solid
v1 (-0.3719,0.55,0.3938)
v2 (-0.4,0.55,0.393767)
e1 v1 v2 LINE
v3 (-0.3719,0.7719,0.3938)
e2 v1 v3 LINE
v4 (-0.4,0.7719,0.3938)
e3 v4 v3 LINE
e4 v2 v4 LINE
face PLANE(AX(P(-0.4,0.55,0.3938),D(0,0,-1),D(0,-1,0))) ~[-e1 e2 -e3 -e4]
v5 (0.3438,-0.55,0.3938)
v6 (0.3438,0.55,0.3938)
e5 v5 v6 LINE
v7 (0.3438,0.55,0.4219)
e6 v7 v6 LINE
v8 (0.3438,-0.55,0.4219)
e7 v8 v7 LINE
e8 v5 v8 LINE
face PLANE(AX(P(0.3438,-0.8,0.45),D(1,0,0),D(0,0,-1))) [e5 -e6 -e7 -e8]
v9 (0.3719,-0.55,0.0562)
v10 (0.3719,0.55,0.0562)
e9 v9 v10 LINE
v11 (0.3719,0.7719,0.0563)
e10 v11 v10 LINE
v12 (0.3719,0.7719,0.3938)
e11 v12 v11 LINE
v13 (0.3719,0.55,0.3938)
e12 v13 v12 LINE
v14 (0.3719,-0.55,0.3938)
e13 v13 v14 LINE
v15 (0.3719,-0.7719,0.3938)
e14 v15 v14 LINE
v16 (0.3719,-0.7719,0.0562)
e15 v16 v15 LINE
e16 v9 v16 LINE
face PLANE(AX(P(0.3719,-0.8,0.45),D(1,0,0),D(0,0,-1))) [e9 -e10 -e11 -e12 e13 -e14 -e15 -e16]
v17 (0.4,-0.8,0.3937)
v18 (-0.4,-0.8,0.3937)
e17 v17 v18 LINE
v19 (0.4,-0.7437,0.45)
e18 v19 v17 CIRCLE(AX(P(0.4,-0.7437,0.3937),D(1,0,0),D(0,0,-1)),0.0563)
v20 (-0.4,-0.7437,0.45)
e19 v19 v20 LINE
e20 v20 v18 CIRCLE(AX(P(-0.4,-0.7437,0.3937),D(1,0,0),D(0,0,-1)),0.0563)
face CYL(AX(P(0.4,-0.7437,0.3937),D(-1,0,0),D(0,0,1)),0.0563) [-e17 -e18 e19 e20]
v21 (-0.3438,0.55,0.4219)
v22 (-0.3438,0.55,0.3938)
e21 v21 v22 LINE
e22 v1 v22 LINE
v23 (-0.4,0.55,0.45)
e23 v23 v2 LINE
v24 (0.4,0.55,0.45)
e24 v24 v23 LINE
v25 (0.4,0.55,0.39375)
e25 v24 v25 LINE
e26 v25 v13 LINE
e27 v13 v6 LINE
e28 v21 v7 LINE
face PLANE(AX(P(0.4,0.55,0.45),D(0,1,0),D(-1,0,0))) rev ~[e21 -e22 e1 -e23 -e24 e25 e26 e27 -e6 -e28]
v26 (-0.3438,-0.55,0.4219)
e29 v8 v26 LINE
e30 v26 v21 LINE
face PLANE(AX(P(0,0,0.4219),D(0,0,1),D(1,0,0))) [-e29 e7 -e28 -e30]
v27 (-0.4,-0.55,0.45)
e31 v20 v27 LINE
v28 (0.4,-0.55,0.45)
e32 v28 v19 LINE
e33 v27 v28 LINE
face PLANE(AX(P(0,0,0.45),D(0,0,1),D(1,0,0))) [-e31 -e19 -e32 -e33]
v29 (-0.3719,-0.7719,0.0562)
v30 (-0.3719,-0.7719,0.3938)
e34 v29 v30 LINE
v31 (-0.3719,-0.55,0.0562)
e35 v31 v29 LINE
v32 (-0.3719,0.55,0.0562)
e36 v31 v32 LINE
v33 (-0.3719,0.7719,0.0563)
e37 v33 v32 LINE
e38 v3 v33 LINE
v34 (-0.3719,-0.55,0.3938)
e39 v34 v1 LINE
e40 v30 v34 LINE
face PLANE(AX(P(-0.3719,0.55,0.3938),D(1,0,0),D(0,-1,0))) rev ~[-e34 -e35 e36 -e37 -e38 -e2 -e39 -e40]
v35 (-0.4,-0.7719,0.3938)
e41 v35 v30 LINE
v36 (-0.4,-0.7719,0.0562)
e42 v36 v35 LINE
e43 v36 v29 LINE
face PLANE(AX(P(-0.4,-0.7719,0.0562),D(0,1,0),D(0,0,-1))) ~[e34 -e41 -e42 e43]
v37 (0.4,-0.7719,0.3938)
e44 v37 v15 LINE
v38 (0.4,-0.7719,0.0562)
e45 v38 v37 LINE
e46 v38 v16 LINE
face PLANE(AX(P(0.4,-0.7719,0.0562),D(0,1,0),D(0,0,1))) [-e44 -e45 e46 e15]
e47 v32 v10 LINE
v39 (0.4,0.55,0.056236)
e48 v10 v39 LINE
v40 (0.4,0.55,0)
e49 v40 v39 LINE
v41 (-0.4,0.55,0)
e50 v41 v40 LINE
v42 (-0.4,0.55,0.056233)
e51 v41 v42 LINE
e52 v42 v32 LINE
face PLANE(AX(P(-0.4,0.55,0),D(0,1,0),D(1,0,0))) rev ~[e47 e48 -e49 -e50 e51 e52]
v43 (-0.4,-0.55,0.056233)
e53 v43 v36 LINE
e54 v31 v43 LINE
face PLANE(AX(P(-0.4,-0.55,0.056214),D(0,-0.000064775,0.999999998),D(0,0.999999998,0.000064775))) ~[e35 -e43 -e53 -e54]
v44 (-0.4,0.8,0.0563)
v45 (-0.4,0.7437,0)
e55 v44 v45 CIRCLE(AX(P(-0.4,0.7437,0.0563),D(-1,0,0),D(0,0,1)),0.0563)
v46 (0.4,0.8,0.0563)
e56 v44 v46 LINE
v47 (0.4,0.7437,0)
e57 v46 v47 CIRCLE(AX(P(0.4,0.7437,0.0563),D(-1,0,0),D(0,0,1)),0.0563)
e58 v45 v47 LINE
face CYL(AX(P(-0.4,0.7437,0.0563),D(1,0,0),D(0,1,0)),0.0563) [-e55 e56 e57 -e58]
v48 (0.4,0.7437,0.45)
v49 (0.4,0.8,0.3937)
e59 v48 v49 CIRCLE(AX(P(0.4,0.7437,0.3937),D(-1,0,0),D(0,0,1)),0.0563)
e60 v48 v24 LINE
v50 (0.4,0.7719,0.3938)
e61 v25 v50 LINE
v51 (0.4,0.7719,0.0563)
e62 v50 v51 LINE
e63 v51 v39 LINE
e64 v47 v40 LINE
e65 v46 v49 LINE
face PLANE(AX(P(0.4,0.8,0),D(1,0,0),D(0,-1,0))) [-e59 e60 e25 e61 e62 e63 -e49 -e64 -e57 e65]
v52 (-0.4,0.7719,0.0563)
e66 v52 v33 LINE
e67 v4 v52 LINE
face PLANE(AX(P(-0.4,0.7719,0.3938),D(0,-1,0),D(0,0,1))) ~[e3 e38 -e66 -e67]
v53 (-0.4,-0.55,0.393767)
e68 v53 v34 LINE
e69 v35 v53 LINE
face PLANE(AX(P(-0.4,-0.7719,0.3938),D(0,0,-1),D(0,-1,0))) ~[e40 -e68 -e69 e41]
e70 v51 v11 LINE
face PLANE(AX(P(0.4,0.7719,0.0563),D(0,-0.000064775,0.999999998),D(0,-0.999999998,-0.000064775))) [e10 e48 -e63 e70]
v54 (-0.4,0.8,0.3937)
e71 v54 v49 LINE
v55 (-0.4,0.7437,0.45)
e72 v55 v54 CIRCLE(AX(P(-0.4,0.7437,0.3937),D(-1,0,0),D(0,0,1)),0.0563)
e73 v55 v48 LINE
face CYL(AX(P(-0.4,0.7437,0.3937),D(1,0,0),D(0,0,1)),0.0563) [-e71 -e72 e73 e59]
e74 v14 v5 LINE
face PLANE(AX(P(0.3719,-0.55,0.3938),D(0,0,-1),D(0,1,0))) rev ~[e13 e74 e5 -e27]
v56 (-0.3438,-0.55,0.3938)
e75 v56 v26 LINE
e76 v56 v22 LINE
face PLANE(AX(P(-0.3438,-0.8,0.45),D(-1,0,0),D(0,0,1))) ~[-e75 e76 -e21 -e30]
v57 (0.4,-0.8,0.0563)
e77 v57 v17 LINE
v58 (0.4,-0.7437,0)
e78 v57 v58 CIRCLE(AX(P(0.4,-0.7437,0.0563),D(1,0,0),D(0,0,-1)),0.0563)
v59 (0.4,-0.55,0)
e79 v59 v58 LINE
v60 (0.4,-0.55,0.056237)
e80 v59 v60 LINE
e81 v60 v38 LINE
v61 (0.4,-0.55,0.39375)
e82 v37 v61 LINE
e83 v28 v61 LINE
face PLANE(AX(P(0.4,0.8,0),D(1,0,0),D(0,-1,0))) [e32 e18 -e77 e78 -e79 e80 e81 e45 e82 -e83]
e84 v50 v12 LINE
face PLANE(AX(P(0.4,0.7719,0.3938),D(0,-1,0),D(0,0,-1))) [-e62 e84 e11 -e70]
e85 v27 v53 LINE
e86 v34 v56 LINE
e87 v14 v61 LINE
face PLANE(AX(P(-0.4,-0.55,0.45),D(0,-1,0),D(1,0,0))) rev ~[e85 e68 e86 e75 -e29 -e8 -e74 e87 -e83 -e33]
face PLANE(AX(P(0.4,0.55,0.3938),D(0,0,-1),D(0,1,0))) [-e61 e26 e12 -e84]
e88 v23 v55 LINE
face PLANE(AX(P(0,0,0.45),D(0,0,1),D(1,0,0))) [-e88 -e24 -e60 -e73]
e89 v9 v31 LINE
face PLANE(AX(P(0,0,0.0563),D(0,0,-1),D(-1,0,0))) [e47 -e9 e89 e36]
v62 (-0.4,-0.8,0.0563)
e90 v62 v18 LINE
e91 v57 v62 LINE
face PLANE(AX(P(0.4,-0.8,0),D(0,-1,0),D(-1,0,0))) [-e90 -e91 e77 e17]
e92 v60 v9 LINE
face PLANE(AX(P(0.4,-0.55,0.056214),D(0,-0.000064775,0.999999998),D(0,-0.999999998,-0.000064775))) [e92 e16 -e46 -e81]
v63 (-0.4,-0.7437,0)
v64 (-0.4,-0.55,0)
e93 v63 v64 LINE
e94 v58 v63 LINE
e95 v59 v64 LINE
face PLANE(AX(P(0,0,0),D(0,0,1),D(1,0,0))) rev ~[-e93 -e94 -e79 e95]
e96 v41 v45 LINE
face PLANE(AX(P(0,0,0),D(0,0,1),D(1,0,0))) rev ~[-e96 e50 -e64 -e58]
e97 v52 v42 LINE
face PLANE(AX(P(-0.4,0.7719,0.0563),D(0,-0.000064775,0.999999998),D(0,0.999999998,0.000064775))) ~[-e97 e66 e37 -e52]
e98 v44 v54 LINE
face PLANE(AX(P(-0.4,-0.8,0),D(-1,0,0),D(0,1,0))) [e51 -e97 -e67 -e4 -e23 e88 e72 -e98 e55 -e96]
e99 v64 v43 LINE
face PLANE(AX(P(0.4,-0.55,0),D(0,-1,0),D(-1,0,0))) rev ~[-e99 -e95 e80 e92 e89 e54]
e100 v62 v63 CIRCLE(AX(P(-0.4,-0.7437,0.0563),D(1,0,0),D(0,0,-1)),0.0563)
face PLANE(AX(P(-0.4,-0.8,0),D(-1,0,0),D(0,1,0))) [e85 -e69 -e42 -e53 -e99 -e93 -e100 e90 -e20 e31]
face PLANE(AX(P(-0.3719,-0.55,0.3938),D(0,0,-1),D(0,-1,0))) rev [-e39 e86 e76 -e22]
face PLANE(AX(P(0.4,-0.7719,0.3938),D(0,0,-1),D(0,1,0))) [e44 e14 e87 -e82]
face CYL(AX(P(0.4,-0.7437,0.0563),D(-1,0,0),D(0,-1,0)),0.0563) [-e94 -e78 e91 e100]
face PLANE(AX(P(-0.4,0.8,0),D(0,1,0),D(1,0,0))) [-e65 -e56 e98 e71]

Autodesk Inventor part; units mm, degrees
ref_plane "YZ Plane" through (0, 0, 0) normal (1, 0, 0) x (0, 1, 0)
ref_plane "XZ Plane" through (0, 0, 0) normal (0, 1, 0) x (-1, 0, 0)
ref_plane "XY Plane" through (0, 0, 0) normal (0, 0, 1) x (1, 0, 0)
sketch "Sketch1" plane through (0, 0, 0) normal (0, 0, 1) x (1, 0, 0)
  line L0 (0.4, -0.8) -> (-0.4, -0.8)
  line L1 (-0.4, -0.8) -> (-0.4, 0.8)
  line L2 (-0.4, 0.8) -> (0.4, 0.8)
  line L3 (0.4, 0.8) -> (0.4, -0.8)
  line L4 (0.4, -0.8) -> (-0.4, 0.8) construction
  line L5 (-0.4, -0.8) -> (0.4, 0.8) construction
  point P0 (0, 0)
  dimension "d0" = 0.8
  dimension "d1" = 1.6
extrude "Extrusion1" add sketch "Sketch1" along normal blind 0.45
sketch "Sketch2" plane through (0, 0, 0) normal (0, 0, -1) x (-1, 0, 0)
  line L0 (-0.4, -0.8) -> (0.4, -0.8) projected
  line L1 (0.4, -0.8) -> (0.4, 0.8) projected
  line L2 (0.4, 0.8) -> (-0.4, 0.8) projected
  line L3 (-0.4, 0.8) -> (-0.4, -0.8) projected
  line L4 (-0.4, -0.55) -> (0.4, -0.55)
  line L5 (0.4, 0.8) -> (0.4, -0.8) projected
  line L6 (0.4, 0.55) -> (-0.4, 0.55)
  point P0 (0, 0)
  dimension "d4" = 0.25
  dimension "d5" = 0.25
extrude "Extrusion2" cut sketch "Sketch2" against normal blind 0.0563 contours L3 L6 L1 L4
sketch "Sketch3" plane through (0, 0, 0.45) normal (0, 0, 1) x (1, 0, 0)
  line L0 (-0.4, -0.8) -> (0.4, -0.8) projected
  line L1 (0.4, -0.8) -> (0.4, 0.8) projected
  line L2 (0.4, 0.8) -> (-0.4, 0.8) projected
  line L3 (-0.4, 0.8) -> (-0.4, -0.8) projected
  line L4 (-0.4, 0.55) -> (-0.4, -0.55) projected
  line L5 (-0.4, -0.8) -> (-0.4, 0.8) projected
  line L6 (0.4, 0.8) -> (-0.4, 0.8) projected
  line L7 (0.4, 0.55) -> (-0.4, 0.55)
  line L8 (-0.4, 0.55) -> (-0.4, -0.55)
  line L9 (-0.4, -0.55) -> (0.4, -0.55)
  line L10 (0.4, -0.55) -> (0.4, 0.55)
  line L11 (0.4, 0.55) -> (-0.4, -0.55) construction
  line L12 (-0.4, 0.55) -> (0.4, -0.55) construction
  point P0 (0, 0)
  dimension "d22" = 0.25
extrude "Extrusion7" cut sketch "Sketch3" against normal blind 0.0563 contours L3 L7 L1 L9
sketch "Sketch4" plane through (0.4, -0.8, 0.45) normal (1, 0, 0) x (0, 0, -1)
  line L0 (0, 0) -> (0, 0.25) projected
  line L1 (0.45, 0) -> (0, 0) projected
  line L2 (0.45, 0.25) -> (0.45, 0) projected
  line L3 (0.45, 1.6) -> (0, 1.6) projected
  line L4 (0.45, 0.25) -> (0.3938, 0.25) projected
  line L5 (0.3938, 0.25) -> (0.3938, 1.35) projected
  line L6 (0.3938, 1.35) -> (0.45, 1.35) projected
  line L7 (0.45, 1.6) -> (0.45, 1.35) projected
  line L8 (0.0562, 0.25) -> (0, 0.25) projected
  line L9 (0, 1.35) -> (0.0562, 1.35) projected
  line L10 (0.0562, 1.35) -> (0.0562, 0.25) projected
  line L11 (0.3938, 0.0281) -> (0.0562, 0.0281)
  line L12 (0.0562, 0.0281) -> (0.0562, 1.5719)
  line L13 (0.0562, 1.5719) -> (0.3937, 1.5719)
  line L14 (0.3937, 1.5719) -> (0.3938, 0.0281)
  line L15 (0.3938, 0.0281) -> (0.0562, 1.5719) construction
  line L16 (0.0562, 0.0281) -> (0.3937, 1.5719) construction
  line L17 (0, 1.35) -> (0, 1.6) projected
  point P0 (0.225, 0.8)
  dimension "d25" = 0.0281
  dimension "d26" = 0.0281
extrude "Extrusion8" cut sketch "Sketch4" against normal blind 0.0281 contours L10 L12 L13 L14 L5 L11
mirror "Mirror1" about plane through (0, 0, 0) normal (1, 0, 0) of "Extrusion8"
sketch "Sketch7" plane through (0, 0, 0.3938) normal (0, 0, 1) x (1, 0, 0)
  line L0 (-0.3719, 0.55) -> (-0.3719, -0.55) projected
  line L1 (0.3719, -0.55) -> (-0.3719, -0.55) projected
  line L2 (0.3719, -0.55) -> (0.3719, 0.55) projected
  line L3 (-0.3719, 0.55) -> (0.3719, 0.55) projected
  point P0 (0, 0)
extrude "Extrusion9" add sketch "Sketch7" along normal blind 0.0281
sketch "Sketch8" plane through (0.3719, -0.8, 0.45) normal (1, 0, 0) x (0, 0, -1)
  line L0 (0.3938, 0.0281) -> (0.0562, 0.0281) projected
  line L1 (0.3938, 0.25) -> (0.3938, 0.0281) projected
  line L2 (0.3937, 1.35) -> (0.3938, 0.25) projected
  line L3 (0.3937, 1.5719) -> (0.3937, 1.35) projected
  line L4 (0.0562, 1.5719) -> (0.3937, 1.5719) projected
  line L5 (0.0562, 1.35) -> (0.0562, 1.5719) projected
  line L6 (0.0281, 1.35) -> (0.0562, 1.35) projected
  line L7 (0.0281, 0.25) -> (0.0281, 1.35) projected
  line L8 (0.0562, 0.25) -> (0.0281, 0.25) projected
  line L9 (0.0562, 0.0281) -> (0.0562, 0.25) projected
  line L10 (0.0562, 0.25) -> (0.0562, 1.35)
  point P0 (0.45, 0.8)
extrude "Extrusion10" cut sketch "Sketch8" against normal blind 0.0281 contours L8 L7 L6 L10
mirror "Mirror2" about plane through (0, 0, 0) normal (1, 0, 0) of "Extrusion10"
fillet "Fillet1" radius 0.0563 4 edges at (0, -0.8, 0.45) (0, 0.8, 0.45) (0, 0.8, 0) (0, -0.8, 0)
equation "\"d0\" = width"
equation "\"d1\" = length"
equation "\"d2\" = height"
equation "\"d4\" = i2"
equation "\"d5\" = i2"
equation "\"d6\" = 0.125 * height"
equation "\"d22\" = i1"
equation "\"d23\" = 0.125 * height"
equation "\"d25\" = 0.0625 * height"
equation "\"d26\" = 0.0625 * height"
equation "\"d27\" = 0.0625 * height"
equation "\"d29\" = 0.0625 * height"
equation "\"d31\" = 0.0625 * height"
equation "\"d21\" = 0.125 * height"
equation "\"length\" = 1.6"
equation "\"width\" = 0.8"
equation "\"height\" = 0.45"
equation "\"i1\" = 0.25"
equation "\"i2\" = 0.25"
properties part number "RC0603" material "ABS Plastic"
